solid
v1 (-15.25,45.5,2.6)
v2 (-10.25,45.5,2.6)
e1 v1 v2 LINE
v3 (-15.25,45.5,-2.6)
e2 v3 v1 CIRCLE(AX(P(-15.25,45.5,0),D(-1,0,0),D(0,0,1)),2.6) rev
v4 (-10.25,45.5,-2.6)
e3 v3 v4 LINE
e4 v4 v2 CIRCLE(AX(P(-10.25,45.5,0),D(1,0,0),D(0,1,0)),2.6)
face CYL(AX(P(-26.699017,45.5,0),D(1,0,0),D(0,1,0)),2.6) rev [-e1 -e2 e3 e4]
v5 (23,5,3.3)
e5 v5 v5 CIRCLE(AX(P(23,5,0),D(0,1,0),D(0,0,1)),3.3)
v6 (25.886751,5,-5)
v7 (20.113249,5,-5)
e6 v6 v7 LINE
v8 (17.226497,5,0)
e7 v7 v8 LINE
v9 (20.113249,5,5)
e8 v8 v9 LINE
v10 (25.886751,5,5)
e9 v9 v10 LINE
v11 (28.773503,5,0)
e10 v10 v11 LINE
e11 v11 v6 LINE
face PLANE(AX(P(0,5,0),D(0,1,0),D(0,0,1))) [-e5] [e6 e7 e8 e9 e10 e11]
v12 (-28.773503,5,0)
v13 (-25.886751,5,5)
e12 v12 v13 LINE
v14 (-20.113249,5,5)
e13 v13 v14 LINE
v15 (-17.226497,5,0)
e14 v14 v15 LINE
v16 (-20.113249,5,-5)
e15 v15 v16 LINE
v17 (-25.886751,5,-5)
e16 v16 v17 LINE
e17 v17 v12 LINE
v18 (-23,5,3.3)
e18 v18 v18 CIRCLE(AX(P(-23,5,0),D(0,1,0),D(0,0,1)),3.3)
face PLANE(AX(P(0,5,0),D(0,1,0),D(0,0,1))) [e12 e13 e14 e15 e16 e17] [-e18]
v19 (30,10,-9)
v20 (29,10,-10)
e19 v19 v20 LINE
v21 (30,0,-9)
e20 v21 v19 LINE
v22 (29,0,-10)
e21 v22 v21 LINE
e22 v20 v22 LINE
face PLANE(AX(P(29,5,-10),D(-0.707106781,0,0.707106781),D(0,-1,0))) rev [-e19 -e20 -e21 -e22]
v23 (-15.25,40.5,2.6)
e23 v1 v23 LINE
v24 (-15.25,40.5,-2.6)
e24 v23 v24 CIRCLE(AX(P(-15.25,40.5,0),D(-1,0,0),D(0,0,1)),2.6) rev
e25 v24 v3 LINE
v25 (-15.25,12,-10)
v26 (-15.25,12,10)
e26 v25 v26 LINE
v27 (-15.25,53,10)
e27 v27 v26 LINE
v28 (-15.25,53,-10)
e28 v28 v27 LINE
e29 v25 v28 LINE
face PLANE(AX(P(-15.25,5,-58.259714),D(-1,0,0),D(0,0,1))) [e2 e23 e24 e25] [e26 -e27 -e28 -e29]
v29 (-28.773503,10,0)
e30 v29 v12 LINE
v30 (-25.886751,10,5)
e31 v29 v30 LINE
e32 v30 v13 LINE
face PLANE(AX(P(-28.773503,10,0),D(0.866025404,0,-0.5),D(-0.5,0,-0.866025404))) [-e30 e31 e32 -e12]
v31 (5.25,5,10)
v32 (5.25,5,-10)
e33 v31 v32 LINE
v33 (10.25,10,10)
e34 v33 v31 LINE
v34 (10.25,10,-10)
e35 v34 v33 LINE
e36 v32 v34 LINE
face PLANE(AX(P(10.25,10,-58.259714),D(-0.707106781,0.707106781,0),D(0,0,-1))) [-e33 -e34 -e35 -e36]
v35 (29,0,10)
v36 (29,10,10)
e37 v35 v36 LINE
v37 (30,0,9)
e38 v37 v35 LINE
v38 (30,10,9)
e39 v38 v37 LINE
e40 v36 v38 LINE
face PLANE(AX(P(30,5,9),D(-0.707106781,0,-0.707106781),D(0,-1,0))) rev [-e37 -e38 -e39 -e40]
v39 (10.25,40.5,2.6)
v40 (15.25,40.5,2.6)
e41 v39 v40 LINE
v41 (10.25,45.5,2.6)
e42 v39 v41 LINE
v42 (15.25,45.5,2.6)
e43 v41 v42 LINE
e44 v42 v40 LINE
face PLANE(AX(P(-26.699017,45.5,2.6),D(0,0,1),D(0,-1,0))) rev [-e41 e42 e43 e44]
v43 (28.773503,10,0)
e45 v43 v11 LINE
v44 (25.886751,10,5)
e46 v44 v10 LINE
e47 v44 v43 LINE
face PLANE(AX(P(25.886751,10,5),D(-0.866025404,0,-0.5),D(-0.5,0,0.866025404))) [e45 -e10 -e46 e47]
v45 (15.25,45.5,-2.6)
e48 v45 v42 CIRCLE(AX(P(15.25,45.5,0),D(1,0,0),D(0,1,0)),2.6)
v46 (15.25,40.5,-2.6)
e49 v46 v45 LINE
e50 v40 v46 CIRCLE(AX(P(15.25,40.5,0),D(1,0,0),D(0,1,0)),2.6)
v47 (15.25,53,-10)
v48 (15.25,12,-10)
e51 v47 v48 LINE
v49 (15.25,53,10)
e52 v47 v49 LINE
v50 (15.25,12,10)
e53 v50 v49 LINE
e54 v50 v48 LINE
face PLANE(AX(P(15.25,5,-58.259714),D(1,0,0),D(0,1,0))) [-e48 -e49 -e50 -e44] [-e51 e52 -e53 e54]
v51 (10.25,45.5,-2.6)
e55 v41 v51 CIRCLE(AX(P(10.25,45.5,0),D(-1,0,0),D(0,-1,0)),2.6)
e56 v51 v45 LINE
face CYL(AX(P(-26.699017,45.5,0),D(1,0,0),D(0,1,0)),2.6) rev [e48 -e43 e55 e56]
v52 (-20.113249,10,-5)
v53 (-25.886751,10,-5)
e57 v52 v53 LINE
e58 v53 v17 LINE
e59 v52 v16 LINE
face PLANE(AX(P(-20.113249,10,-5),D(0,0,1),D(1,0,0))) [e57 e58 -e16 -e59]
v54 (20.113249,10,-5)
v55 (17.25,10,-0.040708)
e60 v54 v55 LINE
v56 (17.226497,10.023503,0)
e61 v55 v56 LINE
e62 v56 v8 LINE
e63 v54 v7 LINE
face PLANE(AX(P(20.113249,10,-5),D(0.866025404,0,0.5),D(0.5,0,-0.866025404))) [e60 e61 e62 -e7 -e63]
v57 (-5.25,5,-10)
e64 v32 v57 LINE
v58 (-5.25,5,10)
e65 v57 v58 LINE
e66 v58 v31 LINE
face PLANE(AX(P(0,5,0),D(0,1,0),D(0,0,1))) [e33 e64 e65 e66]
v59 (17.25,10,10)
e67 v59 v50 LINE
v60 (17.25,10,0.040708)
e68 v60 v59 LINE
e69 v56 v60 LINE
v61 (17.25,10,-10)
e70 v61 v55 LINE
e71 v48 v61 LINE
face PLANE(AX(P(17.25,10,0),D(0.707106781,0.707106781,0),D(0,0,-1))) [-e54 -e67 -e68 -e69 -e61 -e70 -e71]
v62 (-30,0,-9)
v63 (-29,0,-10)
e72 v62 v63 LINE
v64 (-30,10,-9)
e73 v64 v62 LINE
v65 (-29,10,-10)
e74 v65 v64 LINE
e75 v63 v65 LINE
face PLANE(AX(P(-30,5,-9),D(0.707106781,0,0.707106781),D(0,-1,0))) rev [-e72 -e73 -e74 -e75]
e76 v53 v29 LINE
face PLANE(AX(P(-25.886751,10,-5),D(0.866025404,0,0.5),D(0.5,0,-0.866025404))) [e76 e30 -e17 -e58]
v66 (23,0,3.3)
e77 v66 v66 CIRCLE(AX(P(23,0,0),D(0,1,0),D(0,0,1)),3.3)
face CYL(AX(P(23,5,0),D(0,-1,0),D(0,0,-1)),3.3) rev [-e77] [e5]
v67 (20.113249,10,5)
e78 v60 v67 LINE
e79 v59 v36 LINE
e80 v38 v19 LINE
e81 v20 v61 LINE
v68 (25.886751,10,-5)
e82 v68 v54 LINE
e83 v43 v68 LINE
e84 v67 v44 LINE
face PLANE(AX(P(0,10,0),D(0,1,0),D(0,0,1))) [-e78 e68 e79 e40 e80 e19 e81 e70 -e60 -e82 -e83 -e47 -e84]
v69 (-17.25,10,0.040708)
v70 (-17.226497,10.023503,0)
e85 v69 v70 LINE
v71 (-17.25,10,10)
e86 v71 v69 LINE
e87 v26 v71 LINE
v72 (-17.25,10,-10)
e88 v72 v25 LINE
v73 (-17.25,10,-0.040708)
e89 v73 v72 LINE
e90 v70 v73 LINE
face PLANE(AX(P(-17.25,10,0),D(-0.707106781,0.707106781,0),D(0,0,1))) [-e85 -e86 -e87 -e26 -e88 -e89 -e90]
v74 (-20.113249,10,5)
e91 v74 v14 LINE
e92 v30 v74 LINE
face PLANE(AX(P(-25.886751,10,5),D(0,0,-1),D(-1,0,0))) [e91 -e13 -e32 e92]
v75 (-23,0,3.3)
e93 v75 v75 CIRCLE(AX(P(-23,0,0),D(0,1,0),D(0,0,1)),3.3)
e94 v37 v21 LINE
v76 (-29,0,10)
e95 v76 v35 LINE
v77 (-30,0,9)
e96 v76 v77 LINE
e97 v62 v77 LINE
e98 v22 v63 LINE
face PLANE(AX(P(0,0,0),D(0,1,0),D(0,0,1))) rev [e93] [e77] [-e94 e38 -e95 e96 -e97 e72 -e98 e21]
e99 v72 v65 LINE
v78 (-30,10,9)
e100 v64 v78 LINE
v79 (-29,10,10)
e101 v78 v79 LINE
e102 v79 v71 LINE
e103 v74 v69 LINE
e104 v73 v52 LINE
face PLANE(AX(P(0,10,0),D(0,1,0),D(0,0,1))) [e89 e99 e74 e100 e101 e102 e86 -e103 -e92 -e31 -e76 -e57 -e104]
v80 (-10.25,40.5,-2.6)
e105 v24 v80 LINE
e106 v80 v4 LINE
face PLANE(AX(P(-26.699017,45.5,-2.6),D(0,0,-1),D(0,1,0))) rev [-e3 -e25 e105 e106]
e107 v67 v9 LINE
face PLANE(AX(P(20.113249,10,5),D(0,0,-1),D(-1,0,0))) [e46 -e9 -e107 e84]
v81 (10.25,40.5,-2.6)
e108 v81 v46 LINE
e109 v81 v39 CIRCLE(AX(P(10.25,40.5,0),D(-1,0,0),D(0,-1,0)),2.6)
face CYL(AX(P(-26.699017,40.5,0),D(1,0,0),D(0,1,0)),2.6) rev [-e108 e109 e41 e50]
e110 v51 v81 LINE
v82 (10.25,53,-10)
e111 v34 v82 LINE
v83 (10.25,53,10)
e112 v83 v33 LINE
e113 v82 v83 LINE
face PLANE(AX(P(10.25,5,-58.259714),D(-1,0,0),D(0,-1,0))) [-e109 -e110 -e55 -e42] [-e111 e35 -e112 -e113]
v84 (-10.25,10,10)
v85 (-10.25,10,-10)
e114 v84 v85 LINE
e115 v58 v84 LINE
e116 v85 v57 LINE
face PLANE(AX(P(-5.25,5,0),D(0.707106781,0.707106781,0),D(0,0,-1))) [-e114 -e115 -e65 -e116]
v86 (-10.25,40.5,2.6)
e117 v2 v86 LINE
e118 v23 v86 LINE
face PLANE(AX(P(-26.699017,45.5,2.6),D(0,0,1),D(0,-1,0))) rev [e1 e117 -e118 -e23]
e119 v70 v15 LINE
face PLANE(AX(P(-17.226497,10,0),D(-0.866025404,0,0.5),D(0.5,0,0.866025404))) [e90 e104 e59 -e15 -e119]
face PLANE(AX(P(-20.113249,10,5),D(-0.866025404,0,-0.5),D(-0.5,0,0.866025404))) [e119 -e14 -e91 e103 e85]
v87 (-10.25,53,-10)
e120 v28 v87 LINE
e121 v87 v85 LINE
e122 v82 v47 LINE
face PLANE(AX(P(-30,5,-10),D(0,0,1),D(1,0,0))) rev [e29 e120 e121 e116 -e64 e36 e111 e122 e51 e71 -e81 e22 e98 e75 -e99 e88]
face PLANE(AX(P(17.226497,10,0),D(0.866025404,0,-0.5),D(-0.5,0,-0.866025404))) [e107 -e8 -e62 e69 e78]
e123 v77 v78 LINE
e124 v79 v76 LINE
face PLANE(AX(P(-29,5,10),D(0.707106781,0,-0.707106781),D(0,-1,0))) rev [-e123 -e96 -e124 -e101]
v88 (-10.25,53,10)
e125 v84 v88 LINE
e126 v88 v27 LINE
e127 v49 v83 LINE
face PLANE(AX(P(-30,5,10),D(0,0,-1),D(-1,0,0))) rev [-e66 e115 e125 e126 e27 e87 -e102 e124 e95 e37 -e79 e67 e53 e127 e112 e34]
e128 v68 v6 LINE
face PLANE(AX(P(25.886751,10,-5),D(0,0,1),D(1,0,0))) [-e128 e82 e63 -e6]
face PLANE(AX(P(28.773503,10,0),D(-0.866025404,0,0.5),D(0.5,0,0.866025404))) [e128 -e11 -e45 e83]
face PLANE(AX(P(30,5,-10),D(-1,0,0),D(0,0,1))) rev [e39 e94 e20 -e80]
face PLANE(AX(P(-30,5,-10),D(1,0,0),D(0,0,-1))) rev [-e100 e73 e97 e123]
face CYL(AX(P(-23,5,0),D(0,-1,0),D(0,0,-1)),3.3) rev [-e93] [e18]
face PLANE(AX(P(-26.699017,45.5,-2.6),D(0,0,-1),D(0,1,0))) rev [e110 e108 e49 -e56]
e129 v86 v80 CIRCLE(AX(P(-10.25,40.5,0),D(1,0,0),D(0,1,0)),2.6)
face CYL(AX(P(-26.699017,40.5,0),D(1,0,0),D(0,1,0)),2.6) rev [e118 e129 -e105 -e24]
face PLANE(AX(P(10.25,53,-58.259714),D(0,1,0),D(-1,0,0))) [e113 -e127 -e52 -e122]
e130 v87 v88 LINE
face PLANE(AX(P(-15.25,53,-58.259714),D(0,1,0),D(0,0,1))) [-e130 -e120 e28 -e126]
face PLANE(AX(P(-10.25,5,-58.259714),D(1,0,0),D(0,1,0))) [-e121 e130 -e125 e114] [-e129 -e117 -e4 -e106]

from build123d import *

# Parameters (mm, degrees)
SKETCH2_W           = 60
SKETCH2_H           = 20
SKETCH2_R           = 3.3
BOSS_EXTRUDE2_DEPTH = 5
SKETCH3_W           = 5
SKETCH3_H           = 48
BOSS_EXTRUDE3_DEPTH = 20
CUT_EXTRUDE1_REACH  = 72.403
SKETCH5_W           = 14.75
SKETCH5_H           = 20
BOSS_EXTRUDE4_DEPTH = 5
CHAMFER1_SIZE       = 2
CHAMFER2_SIZE       = 5
CHAMFER3_SIZE       = 1


with BuildPart() as part:
    # Sketch2 → Boss-Extrude2 (new body)
    with BuildSketch(Plane(origin=(0, 0, 0), x_dir=(1, 0, 0), z_dir=(0, 1, 0))):
        Rectangle(SKETCH2_W, SKETCH2_H)
        with Locations(Location((-23, 0, 0), (0, 0, 270))):
            Circle(SKETCH2_R, mode=Mode.SUBTRACT)
        with Locations(Location((23, 0, 0), (0, 0, 270))):
            Circle(SKETCH2_R, mode=Mode.SUBTRACT)
    extrude(amount=BOSS_EXTRUDE2_DEPTH)

    # Sketch3 → Boss-Extrude3 (add)
    with BuildSketch(Plane.XY.offset(10)):
        with Locations((-12.75, 29)):
            Rectangle(SKETCH3_W, SKETCH3_H)
        with Locations((12.75, 29)):
            Rectangle(SKETCH3_W, SKETCH3_H)
    extrude(amount=-BOSS_EXTRUDE3_DEPTH)

    # Cut-Extrude1: up to this face of the body (flat: up to its plane)
    cut_extrude1_end = Plane(part.part.faces().sort_by_distance((-15.25, 29, 0))[0])
    # Sketch4 → Cut-Extrude1 (cut, up to the picked face)
    with BuildSketch(Plane(origin=(15.25, 0, 0), x_dir=(0, 0, -1), z_dir=(1, 0, 0)), mode=Mode.PRIVATE) as cut_extrude1_sk1:
        with BuildLine():
            Line((2.6, 45.5), (2.6, 40.5))
            ThreePointArc((2.6, 40.5), (0, 37.9), (-2.6, 40.5))
            Line((-2.6, 40.5), (-2.6, 45.5))
            ThreePointArc((-2.6, 45.5), (0, 48.1), (2.6, 45.5))
        make_face()
    cut_extrude1_tool1 = split(extrude(cut_extrude1_sk1.sketch, amount=-CUT_EXTRUDE1_REACH, mode=Mode.PRIVATE), bisect_by=cut_extrude1_end, keep=Keep.BOTH, mode=Mode.PRIVATE)
    add(cut_extrude1_tool1.solids().sort_by(Axis((15.25, 43, 0), (-1, 0, 0)))[0], mode=Mode.SUBTRACT)

    # Sketch5 → Boss-Extrude4 (add)
    # profile 1 of 2: a face of its own
    with BuildSketch(Plane(origin=(0, 5, 0), x_dir=(1, 0, 0), z_dir=(0, 1, 0))):
        with Locations((22.625, 0)):
            Rectangle(SKETCH5_W, SKETCH5_H)
        Polygon((28.773502692, 0), (25.886751346, 5), (20.113248654, 5), (17.226497308, 0), (20.113248654, -5), (25.886751346, -5), align=None, mode=Mode.SUBTRACT)
    # profile 2 of 2: a face of its own
    with BuildSketch(Plane(origin=(0, 5, 0), x_dir=(1, 0, 0), z_dir=(0, 1, 0))):
        with Locations((-22.625, 0)):
            Rectangle(SKETCH5_W, SKETCH5_H)
        Polygon((-17.226497308, 0), (-20.113248654, 5), (-25.886751346, 5), (-28.773502692, 0), (-25.886751346, -5), (-20.113248654, -5), align=None, mode=Mode.SUBTRACT)
    extrude(amount=BOSS_EXTRUDE4_DEPTH)

    # Chamfer1
    # the kernel refuses this chamfer: 2 mm, written as the material it adds along each edge
    with BuildSketch(Plane(origin=(15.25, 10, -10), x_dir=(0.9996219169112968, -0.02749587661058651, 0), z_dir=(0, 0, 1))) as chamfer1_piece_1_section:
        Polygon((CHAMFER1_SIZE * 0.999621916911, CHAMFER1_SIZE * 0.0274958766106), (-CHAMFER1_SIZE * 0.0274958766106, CHAMFER1_SIZE * 0.999621916911), (0, 0), align=None)
    chamfer1_piece_1 = extrude(amount=20, mode=Mode.PRIVATE)
    chamfer1_piece_1 = split(chamfer1_piece_1, bisect_by=Plane(origin=(14.273862805, 10.629145716, -5.114112976), z_dir=(0.8660254037844387, 0, -0.49999999999999994)), keep=Keep.TOP, mode=Mode.PRIVATE)
    chamfer1_piece_1 = split(chamfer1_piece_1, bisect_by=Plane(origin=(19.549147449, 10.629145716, -4.022948051), z_dir=(-0.8660254037844387, 0, -0.49999999999999994)), keep=Keep.TOP, mode=Mode.PRIVATE)
    add(chamfer1_piece_1)
    with BuildSketch(Plane(origin=(15.25, 10, -10), x_dir=(0.9996219169112968, -0.02749587661058651, 0), z_dir=(0, 0, 1))) as chamfer1_piece_2_section:
        Polygon((CHAMFER1_SIZE * 0.999621916911, CHAMFER1_SIZE * 0.0274958766106), (-CHAMFER1_SIZE * 0.0274958766106, CHAMFER1_SIZE * 0.999621916911), (0, 0), align=None)
    chamfer1_piece_2 = extrude(amount=20, mode=Mode.PRIVATE)
    chamfer1_piece_2 = split(chamfer1_piece_2, bisect_by=Plane(origin=(16.849076721, 10.762644927, -0.653711633), z_dir=(-0.8660254037844387, 0, 0.49999999999999994)), keep=Keep.TOP, mode=Mode.PRIVATE)
    chamfer1_piece_2 = split(chamfer1_piece_2, bisect_by=Plane(origin=(16.849076721, 10.762644927, 0.653711633), z_dir=(-0.8660254037844387, 0, -0.49999999999999994)), keep=Keep.TOP, mode=Mode.PRIVATE)
    add(chamfer1_piece_2)
    with BuildSketch(Plane(origin=(15.25, 10, -10), x_dir=(0.9996219169112968, -0.02749587661058651, 0), z_dir=(0, 0, 1))) as chamfer1_piece_3_section:
        Polygon((CHAMFER1_SIZE * 0.999621916911, CHAMFER1_SIZE * 0.0274958766106), (-CHAMFER1_SIZE * 0.0274958766106, CHAMFER1_SIZE * 0.999621916911), (0, 0), align=None)
    chamfer1_piece_3 = extrude(amount=20, mode=Mode.PRIVATE)
    chamfer1_piece_3 = split(chamfer1_piece_3, bisect_by=Plane(origin=(19.549147449, 10.629145716, 4.022948051), z_dir=(-0.8660254037844387, 0, 0.49999999999999994)), keep=Keep.TOP, mode=Mode.PRIVATE)
    chamfer1_piece_3 = split(chamfer1_piece_3, bisect_by=Plane(origin=(14.273862805, 10.629145716, 5.114112976), z_dir=(0.8660254037844387, 0, 0.49999999999999994)), keep=Keep.TOP, mode=Mode.PRIVATE)
    add(chamfer1_piece_3)
    with BuildSketch(Plane(origin=(-15.25, 10, 10), x_dir=(0.027495876610586487, 0.9996219169112968, 0), z_dir=(0, 0, -1))) as chamfer1_piece_4_section:
        Polygon((CHAMFER1_SIZE * 0.999621916911, -CHAMFER1_SIZE * 0.0274958766106), (-CHAMFER1_SIZE * 0.0274958766106, -CHAMFER1_SIZE * 0.999621916911), (0, 0), align=None)
    chamfer1_piece_4 = extrude(amount=20, mode=Mode.PRIVATE)
    chamfer1_piece_4 = split(chamfer1_piece_4, bisect_by=Plane(origin=(-14.273862805, 10.629145716, 5.114112976), z_dir=(-0.8660254037844387, 0, 0.49999999999999994)), keep=Keep.TOP, mode=Mode.PRIVATE)
    chamfer1_piece_4 = split(chamfer1_piece_4, bisect_by=Plane(origin=(-19.549147449, 10.629145716, 4.022948051), z_dir=(0.8660254037844388, 0, 0.49999999999999967)), keep=Keep.TOP, mode=Mode.PRIVATE)
    add(chamfer1_piece_4)
    with BuildSketch(Plane(origin=(-15.25, 10, 10), x_dir=(0.027495876610586487, 0.9996219169112968, 0), z_dir=(0, 0, -1))) as chamfer1_piece_5_section:
        Polygon((CHAMFER1_SIZE * 0.999621916911, -CHAMFER1_SIZE * 0.0274958766106), (-CHAMFER1_SIZE * 0.0274958766106, -CHAMFER1_SIZE * 0.999621916911), (0, 0), align=None)
    chamfer1_piece_5 = extrude(amount=20, mode=Mode.PRIVATE)
    chamfer1_piece_5 = split(chamfer1_piece_5, bisect_by=Plane(origin=(-16.849076721, 10.762644927, 0.653711633), z_dir=(0.8660254037844387, 0, -0.49999999999999994)), keep=Keep.TOP, mode=Mode.PRIVATE)
    chamfer1_piece_5 = split(chamfer1_piece_5, bisect_by=Plane(origin=(-16.849076721, 10.762644927, -0.653711633), z_dir=(0.8660254037844388, 0, 0.49999999999999967)), keep=Keep.TOP, mode=Mode.PRIVATE)
    add(chamfer1_piece_5)
    with BuildSketch(Plane(origin=(-15.25, 10, 10), x_dir=(0.027495876610586487, 0.9996219169112968, 0), z_dir=(0, 0, -1))) as chamfer1_piece_6_section:
        Polygon((CHAMFER1_SIZE * 0.999621916911, -CHAMFER1_SIZE * 0.0274958766106), (-CHAMFER1_SIZE * 0.0274958766106, -CHAMFER1_SIZE * 0.999621916911), (0, 0), align=None)
    chamfer1_piece_6 = extrude(amount=20, mode=Mode.PRIVATE)
    chamfer1_piece_6 = split(chamfer1_piece_6, bisect_by=Plane(origin=(-19.549147449, 10.629145716, -4.022948051), z_dir=(0.8660254037844387, 0, -0.49999999999999994)), keep=Keep.TOP, mode=Mode.PRIVATE)
    chamfer1_piece_6 = split(chamfer1_piece_6, bisect_by=Plane(origin=(-14.273862805, 10.629145716, -5.114112976), z_dir=(-0.8660254037844388, 0, -0.49999999999999967)), keep=Keep.TOP, mode=Mode.PRIVATE)
    add(chamfer1_piece_6)

    # Chamfer2
    chamfer2_edges = [part.edges().sort_by_distance(p)[0] for p in [
        (-10.25, 5, 0),
        (10.25, 5, 0),
    ]]
    chamfer(chamfer2_edges, length=CHAMFER2_SIZE)

    # Chamfer3
    chamfer3_edges = [part.edges().sort_by_distance(p)[0] for p in [
        (30, 5, 10),
        (-30, 5, 10),
        (-30, 5, -10),
        (30, 5, -10),
    ]]
    chamfer(chamfer3_edges, length=CHAMFER3_SIZE)


solid = part.part
